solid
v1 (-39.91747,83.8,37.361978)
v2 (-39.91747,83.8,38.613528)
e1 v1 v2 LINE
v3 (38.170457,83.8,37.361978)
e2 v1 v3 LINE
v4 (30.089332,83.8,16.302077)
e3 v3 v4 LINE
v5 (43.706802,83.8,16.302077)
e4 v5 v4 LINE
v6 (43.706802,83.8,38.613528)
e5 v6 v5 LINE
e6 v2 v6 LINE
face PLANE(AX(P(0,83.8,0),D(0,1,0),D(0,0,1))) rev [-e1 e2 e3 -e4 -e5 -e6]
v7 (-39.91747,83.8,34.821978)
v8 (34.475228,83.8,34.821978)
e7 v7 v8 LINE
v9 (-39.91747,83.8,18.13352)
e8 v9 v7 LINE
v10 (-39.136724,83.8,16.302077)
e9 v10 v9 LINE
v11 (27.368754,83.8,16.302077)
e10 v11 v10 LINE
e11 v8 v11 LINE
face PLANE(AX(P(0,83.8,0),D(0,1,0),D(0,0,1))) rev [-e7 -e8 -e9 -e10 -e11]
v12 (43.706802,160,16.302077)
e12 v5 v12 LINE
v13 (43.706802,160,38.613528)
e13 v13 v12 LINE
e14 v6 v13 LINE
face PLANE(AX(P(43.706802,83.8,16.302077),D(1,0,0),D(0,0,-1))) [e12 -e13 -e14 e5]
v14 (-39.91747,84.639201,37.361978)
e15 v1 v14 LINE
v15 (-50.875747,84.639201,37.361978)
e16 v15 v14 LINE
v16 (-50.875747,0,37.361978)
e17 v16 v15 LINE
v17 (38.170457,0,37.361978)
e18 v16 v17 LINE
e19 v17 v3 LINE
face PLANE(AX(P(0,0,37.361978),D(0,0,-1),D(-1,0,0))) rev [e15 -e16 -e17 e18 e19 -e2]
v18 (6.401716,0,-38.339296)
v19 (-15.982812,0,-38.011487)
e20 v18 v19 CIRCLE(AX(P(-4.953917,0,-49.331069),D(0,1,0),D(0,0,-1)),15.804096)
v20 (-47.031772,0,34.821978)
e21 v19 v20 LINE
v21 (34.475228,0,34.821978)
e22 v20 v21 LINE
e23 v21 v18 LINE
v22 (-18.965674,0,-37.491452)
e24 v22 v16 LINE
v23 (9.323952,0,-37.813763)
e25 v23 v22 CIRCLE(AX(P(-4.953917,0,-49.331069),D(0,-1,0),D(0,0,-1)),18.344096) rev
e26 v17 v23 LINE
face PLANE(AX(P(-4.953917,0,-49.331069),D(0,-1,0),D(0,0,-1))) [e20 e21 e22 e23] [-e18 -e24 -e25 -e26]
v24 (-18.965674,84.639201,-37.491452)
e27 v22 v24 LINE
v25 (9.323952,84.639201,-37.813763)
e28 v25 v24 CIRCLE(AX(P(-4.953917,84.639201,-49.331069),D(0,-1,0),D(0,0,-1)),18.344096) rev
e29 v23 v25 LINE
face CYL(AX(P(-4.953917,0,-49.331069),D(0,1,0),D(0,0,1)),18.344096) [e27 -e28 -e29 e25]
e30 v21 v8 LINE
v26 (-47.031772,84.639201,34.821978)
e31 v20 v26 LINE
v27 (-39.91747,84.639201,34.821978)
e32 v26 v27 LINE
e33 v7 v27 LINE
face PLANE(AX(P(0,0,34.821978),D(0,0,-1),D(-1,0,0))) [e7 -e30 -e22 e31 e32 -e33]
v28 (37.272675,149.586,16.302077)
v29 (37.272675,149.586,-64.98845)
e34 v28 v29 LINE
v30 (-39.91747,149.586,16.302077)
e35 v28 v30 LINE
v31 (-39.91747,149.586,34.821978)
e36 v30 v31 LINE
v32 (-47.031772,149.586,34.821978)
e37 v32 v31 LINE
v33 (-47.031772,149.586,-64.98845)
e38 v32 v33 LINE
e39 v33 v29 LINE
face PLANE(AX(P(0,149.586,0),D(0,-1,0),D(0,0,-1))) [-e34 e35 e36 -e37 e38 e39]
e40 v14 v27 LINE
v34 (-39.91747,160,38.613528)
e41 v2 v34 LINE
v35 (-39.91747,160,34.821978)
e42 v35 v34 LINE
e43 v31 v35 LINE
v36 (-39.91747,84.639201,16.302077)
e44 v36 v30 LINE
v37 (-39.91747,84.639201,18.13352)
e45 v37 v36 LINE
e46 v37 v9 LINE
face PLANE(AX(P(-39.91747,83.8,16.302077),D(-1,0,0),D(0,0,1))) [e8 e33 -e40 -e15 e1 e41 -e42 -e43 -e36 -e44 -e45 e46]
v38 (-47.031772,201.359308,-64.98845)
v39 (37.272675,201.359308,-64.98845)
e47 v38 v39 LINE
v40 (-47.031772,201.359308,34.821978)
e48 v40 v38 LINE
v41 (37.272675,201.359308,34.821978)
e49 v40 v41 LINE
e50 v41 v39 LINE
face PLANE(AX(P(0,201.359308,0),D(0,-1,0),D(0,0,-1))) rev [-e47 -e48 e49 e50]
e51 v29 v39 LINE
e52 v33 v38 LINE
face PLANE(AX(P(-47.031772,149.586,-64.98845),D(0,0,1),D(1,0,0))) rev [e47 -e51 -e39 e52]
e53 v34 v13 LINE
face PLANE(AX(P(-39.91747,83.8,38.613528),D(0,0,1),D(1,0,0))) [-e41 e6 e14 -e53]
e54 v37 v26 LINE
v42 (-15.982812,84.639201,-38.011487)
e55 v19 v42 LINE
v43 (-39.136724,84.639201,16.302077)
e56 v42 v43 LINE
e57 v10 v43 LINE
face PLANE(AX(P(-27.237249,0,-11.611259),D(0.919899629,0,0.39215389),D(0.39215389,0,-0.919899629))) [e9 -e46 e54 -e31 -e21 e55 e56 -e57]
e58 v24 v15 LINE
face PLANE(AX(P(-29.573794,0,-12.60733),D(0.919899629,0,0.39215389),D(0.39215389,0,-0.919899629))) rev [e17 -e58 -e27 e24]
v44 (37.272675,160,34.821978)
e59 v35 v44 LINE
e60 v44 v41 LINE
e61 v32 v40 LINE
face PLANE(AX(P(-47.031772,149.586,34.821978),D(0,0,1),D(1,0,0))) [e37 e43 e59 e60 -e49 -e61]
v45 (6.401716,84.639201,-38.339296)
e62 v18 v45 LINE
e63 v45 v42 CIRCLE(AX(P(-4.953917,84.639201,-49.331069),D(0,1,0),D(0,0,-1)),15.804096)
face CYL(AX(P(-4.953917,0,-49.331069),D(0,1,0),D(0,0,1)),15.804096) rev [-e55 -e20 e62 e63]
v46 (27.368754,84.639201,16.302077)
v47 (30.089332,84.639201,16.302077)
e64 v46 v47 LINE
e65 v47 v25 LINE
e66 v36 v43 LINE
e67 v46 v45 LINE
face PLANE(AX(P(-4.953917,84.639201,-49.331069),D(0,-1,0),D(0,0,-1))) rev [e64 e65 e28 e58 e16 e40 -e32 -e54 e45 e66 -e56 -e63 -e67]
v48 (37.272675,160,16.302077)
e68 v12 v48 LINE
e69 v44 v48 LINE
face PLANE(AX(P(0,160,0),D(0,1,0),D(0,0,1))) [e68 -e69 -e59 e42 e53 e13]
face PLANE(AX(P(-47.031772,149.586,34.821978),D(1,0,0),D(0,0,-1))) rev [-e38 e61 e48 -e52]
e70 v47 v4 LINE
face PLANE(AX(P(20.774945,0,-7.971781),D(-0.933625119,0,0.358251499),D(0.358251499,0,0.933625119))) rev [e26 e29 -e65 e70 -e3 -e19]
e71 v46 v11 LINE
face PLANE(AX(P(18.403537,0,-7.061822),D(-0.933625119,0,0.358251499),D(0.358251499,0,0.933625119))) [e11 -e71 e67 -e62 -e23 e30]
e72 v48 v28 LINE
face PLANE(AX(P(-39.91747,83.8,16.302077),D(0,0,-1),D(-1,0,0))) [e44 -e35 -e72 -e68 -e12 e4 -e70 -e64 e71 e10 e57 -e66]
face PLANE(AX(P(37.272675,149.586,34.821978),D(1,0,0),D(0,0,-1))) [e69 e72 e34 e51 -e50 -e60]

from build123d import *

# Parameters (mm, degrees)
LOFT_THIN1_DEPTH         = 84.63920117
BOSS_EXTRUDE1_DEPTH      = 41.359307983
BOSS_EXTRUDE1_DEPTH_BACK = 10.414
SKETCH8_W                = 84.304447576
SKETCH8_H                = 99.8104289
SKETCH16_W               = 83.624271947
SKETCH16_H               = 22.311451813
BOSS_EXTRUDE2_DEPTH      = 76.2


# Read off the part's stored shape, not the designer's step: Loft-Thin1
with BuildPart() as part:
    # Loft-Thin1 outline → Loft-Thin1 (new body)
    with BuildSketch(Plane(origin=(0, 0, 0), x_dir=(1, 0, 0), z_dir=(0, 1, 0))):
        with BuildLine():
            Line((38.170457439, -37.361978489), (9.323951838, 37.81376338))
            ThreePointArc((9.323951838, 37.81376338), (-5.162903092, 67.673974593), (-18.965674378, 37.491451765))
            Line((-18.965674378, 37.491451765), (-50.875746846, -37.361978489))
            Line((-50.875746846, -37.361978489), (38.170457439, -37.361978489))
        make_face()
        with BuildLine():
            ThreePointArc((-15.982812233, 38.011486845), (-5.185335077, 65.133470666), (6.401715759, 38.339296444))
            Line((6.401715759, 38.339296444), (34.475228233, -34.821978489))
            Line((34.475228233, -34.821978489), (-47.031772168, -34.821978489))
            Line((-47.031772168, -34.821978489), (-15.982812233, 38.011486845))
        make_face(mode=Mode.SUBTRACT)
    extrude(amount=LOFT_THIN1_DEPTH)



with BuildPart() as body_2:
    # Sketch8 → Boss-Extrude1 (new, two sides: drawn at the far end of the back side and taken through both)
    with BuildSketch(Plane(origin=(0, 160, 0), x_dir=(1, 0, 0), z_dir=(0, 1, 0)).offset(-BOSS_EXTRUDE1_DEPTH_BACK)):
        with Locations((-4.87954838, 15.083235961)):
            Rectangle(SKETCH8_W, SKETCH8_H)
    extrude(amount=BOSS_EXTRUDE1_DEPTH + BOSS_EXTRUDE1_DEPTH_BACK)


with BuildPart() as part_1:
    add(part.part)

    add(body_2.part)  # Boss-Extrude2 merges body 2
    # Sketch16 → Boss-Extrude2 (add)
    with BuildSketch(Plane(origin=(0, 160, 0), x_dir=(1, 0, 0), z_dir=(0, 1, 0))):
        with Locations((1.894665963, -27.457802507)):
            Rectangle(SKETCH16_W, SKETCH16_H)
    extrude(amount=-BOSS_EXTRUDE2_DEPTH)


solid = part_1.part
